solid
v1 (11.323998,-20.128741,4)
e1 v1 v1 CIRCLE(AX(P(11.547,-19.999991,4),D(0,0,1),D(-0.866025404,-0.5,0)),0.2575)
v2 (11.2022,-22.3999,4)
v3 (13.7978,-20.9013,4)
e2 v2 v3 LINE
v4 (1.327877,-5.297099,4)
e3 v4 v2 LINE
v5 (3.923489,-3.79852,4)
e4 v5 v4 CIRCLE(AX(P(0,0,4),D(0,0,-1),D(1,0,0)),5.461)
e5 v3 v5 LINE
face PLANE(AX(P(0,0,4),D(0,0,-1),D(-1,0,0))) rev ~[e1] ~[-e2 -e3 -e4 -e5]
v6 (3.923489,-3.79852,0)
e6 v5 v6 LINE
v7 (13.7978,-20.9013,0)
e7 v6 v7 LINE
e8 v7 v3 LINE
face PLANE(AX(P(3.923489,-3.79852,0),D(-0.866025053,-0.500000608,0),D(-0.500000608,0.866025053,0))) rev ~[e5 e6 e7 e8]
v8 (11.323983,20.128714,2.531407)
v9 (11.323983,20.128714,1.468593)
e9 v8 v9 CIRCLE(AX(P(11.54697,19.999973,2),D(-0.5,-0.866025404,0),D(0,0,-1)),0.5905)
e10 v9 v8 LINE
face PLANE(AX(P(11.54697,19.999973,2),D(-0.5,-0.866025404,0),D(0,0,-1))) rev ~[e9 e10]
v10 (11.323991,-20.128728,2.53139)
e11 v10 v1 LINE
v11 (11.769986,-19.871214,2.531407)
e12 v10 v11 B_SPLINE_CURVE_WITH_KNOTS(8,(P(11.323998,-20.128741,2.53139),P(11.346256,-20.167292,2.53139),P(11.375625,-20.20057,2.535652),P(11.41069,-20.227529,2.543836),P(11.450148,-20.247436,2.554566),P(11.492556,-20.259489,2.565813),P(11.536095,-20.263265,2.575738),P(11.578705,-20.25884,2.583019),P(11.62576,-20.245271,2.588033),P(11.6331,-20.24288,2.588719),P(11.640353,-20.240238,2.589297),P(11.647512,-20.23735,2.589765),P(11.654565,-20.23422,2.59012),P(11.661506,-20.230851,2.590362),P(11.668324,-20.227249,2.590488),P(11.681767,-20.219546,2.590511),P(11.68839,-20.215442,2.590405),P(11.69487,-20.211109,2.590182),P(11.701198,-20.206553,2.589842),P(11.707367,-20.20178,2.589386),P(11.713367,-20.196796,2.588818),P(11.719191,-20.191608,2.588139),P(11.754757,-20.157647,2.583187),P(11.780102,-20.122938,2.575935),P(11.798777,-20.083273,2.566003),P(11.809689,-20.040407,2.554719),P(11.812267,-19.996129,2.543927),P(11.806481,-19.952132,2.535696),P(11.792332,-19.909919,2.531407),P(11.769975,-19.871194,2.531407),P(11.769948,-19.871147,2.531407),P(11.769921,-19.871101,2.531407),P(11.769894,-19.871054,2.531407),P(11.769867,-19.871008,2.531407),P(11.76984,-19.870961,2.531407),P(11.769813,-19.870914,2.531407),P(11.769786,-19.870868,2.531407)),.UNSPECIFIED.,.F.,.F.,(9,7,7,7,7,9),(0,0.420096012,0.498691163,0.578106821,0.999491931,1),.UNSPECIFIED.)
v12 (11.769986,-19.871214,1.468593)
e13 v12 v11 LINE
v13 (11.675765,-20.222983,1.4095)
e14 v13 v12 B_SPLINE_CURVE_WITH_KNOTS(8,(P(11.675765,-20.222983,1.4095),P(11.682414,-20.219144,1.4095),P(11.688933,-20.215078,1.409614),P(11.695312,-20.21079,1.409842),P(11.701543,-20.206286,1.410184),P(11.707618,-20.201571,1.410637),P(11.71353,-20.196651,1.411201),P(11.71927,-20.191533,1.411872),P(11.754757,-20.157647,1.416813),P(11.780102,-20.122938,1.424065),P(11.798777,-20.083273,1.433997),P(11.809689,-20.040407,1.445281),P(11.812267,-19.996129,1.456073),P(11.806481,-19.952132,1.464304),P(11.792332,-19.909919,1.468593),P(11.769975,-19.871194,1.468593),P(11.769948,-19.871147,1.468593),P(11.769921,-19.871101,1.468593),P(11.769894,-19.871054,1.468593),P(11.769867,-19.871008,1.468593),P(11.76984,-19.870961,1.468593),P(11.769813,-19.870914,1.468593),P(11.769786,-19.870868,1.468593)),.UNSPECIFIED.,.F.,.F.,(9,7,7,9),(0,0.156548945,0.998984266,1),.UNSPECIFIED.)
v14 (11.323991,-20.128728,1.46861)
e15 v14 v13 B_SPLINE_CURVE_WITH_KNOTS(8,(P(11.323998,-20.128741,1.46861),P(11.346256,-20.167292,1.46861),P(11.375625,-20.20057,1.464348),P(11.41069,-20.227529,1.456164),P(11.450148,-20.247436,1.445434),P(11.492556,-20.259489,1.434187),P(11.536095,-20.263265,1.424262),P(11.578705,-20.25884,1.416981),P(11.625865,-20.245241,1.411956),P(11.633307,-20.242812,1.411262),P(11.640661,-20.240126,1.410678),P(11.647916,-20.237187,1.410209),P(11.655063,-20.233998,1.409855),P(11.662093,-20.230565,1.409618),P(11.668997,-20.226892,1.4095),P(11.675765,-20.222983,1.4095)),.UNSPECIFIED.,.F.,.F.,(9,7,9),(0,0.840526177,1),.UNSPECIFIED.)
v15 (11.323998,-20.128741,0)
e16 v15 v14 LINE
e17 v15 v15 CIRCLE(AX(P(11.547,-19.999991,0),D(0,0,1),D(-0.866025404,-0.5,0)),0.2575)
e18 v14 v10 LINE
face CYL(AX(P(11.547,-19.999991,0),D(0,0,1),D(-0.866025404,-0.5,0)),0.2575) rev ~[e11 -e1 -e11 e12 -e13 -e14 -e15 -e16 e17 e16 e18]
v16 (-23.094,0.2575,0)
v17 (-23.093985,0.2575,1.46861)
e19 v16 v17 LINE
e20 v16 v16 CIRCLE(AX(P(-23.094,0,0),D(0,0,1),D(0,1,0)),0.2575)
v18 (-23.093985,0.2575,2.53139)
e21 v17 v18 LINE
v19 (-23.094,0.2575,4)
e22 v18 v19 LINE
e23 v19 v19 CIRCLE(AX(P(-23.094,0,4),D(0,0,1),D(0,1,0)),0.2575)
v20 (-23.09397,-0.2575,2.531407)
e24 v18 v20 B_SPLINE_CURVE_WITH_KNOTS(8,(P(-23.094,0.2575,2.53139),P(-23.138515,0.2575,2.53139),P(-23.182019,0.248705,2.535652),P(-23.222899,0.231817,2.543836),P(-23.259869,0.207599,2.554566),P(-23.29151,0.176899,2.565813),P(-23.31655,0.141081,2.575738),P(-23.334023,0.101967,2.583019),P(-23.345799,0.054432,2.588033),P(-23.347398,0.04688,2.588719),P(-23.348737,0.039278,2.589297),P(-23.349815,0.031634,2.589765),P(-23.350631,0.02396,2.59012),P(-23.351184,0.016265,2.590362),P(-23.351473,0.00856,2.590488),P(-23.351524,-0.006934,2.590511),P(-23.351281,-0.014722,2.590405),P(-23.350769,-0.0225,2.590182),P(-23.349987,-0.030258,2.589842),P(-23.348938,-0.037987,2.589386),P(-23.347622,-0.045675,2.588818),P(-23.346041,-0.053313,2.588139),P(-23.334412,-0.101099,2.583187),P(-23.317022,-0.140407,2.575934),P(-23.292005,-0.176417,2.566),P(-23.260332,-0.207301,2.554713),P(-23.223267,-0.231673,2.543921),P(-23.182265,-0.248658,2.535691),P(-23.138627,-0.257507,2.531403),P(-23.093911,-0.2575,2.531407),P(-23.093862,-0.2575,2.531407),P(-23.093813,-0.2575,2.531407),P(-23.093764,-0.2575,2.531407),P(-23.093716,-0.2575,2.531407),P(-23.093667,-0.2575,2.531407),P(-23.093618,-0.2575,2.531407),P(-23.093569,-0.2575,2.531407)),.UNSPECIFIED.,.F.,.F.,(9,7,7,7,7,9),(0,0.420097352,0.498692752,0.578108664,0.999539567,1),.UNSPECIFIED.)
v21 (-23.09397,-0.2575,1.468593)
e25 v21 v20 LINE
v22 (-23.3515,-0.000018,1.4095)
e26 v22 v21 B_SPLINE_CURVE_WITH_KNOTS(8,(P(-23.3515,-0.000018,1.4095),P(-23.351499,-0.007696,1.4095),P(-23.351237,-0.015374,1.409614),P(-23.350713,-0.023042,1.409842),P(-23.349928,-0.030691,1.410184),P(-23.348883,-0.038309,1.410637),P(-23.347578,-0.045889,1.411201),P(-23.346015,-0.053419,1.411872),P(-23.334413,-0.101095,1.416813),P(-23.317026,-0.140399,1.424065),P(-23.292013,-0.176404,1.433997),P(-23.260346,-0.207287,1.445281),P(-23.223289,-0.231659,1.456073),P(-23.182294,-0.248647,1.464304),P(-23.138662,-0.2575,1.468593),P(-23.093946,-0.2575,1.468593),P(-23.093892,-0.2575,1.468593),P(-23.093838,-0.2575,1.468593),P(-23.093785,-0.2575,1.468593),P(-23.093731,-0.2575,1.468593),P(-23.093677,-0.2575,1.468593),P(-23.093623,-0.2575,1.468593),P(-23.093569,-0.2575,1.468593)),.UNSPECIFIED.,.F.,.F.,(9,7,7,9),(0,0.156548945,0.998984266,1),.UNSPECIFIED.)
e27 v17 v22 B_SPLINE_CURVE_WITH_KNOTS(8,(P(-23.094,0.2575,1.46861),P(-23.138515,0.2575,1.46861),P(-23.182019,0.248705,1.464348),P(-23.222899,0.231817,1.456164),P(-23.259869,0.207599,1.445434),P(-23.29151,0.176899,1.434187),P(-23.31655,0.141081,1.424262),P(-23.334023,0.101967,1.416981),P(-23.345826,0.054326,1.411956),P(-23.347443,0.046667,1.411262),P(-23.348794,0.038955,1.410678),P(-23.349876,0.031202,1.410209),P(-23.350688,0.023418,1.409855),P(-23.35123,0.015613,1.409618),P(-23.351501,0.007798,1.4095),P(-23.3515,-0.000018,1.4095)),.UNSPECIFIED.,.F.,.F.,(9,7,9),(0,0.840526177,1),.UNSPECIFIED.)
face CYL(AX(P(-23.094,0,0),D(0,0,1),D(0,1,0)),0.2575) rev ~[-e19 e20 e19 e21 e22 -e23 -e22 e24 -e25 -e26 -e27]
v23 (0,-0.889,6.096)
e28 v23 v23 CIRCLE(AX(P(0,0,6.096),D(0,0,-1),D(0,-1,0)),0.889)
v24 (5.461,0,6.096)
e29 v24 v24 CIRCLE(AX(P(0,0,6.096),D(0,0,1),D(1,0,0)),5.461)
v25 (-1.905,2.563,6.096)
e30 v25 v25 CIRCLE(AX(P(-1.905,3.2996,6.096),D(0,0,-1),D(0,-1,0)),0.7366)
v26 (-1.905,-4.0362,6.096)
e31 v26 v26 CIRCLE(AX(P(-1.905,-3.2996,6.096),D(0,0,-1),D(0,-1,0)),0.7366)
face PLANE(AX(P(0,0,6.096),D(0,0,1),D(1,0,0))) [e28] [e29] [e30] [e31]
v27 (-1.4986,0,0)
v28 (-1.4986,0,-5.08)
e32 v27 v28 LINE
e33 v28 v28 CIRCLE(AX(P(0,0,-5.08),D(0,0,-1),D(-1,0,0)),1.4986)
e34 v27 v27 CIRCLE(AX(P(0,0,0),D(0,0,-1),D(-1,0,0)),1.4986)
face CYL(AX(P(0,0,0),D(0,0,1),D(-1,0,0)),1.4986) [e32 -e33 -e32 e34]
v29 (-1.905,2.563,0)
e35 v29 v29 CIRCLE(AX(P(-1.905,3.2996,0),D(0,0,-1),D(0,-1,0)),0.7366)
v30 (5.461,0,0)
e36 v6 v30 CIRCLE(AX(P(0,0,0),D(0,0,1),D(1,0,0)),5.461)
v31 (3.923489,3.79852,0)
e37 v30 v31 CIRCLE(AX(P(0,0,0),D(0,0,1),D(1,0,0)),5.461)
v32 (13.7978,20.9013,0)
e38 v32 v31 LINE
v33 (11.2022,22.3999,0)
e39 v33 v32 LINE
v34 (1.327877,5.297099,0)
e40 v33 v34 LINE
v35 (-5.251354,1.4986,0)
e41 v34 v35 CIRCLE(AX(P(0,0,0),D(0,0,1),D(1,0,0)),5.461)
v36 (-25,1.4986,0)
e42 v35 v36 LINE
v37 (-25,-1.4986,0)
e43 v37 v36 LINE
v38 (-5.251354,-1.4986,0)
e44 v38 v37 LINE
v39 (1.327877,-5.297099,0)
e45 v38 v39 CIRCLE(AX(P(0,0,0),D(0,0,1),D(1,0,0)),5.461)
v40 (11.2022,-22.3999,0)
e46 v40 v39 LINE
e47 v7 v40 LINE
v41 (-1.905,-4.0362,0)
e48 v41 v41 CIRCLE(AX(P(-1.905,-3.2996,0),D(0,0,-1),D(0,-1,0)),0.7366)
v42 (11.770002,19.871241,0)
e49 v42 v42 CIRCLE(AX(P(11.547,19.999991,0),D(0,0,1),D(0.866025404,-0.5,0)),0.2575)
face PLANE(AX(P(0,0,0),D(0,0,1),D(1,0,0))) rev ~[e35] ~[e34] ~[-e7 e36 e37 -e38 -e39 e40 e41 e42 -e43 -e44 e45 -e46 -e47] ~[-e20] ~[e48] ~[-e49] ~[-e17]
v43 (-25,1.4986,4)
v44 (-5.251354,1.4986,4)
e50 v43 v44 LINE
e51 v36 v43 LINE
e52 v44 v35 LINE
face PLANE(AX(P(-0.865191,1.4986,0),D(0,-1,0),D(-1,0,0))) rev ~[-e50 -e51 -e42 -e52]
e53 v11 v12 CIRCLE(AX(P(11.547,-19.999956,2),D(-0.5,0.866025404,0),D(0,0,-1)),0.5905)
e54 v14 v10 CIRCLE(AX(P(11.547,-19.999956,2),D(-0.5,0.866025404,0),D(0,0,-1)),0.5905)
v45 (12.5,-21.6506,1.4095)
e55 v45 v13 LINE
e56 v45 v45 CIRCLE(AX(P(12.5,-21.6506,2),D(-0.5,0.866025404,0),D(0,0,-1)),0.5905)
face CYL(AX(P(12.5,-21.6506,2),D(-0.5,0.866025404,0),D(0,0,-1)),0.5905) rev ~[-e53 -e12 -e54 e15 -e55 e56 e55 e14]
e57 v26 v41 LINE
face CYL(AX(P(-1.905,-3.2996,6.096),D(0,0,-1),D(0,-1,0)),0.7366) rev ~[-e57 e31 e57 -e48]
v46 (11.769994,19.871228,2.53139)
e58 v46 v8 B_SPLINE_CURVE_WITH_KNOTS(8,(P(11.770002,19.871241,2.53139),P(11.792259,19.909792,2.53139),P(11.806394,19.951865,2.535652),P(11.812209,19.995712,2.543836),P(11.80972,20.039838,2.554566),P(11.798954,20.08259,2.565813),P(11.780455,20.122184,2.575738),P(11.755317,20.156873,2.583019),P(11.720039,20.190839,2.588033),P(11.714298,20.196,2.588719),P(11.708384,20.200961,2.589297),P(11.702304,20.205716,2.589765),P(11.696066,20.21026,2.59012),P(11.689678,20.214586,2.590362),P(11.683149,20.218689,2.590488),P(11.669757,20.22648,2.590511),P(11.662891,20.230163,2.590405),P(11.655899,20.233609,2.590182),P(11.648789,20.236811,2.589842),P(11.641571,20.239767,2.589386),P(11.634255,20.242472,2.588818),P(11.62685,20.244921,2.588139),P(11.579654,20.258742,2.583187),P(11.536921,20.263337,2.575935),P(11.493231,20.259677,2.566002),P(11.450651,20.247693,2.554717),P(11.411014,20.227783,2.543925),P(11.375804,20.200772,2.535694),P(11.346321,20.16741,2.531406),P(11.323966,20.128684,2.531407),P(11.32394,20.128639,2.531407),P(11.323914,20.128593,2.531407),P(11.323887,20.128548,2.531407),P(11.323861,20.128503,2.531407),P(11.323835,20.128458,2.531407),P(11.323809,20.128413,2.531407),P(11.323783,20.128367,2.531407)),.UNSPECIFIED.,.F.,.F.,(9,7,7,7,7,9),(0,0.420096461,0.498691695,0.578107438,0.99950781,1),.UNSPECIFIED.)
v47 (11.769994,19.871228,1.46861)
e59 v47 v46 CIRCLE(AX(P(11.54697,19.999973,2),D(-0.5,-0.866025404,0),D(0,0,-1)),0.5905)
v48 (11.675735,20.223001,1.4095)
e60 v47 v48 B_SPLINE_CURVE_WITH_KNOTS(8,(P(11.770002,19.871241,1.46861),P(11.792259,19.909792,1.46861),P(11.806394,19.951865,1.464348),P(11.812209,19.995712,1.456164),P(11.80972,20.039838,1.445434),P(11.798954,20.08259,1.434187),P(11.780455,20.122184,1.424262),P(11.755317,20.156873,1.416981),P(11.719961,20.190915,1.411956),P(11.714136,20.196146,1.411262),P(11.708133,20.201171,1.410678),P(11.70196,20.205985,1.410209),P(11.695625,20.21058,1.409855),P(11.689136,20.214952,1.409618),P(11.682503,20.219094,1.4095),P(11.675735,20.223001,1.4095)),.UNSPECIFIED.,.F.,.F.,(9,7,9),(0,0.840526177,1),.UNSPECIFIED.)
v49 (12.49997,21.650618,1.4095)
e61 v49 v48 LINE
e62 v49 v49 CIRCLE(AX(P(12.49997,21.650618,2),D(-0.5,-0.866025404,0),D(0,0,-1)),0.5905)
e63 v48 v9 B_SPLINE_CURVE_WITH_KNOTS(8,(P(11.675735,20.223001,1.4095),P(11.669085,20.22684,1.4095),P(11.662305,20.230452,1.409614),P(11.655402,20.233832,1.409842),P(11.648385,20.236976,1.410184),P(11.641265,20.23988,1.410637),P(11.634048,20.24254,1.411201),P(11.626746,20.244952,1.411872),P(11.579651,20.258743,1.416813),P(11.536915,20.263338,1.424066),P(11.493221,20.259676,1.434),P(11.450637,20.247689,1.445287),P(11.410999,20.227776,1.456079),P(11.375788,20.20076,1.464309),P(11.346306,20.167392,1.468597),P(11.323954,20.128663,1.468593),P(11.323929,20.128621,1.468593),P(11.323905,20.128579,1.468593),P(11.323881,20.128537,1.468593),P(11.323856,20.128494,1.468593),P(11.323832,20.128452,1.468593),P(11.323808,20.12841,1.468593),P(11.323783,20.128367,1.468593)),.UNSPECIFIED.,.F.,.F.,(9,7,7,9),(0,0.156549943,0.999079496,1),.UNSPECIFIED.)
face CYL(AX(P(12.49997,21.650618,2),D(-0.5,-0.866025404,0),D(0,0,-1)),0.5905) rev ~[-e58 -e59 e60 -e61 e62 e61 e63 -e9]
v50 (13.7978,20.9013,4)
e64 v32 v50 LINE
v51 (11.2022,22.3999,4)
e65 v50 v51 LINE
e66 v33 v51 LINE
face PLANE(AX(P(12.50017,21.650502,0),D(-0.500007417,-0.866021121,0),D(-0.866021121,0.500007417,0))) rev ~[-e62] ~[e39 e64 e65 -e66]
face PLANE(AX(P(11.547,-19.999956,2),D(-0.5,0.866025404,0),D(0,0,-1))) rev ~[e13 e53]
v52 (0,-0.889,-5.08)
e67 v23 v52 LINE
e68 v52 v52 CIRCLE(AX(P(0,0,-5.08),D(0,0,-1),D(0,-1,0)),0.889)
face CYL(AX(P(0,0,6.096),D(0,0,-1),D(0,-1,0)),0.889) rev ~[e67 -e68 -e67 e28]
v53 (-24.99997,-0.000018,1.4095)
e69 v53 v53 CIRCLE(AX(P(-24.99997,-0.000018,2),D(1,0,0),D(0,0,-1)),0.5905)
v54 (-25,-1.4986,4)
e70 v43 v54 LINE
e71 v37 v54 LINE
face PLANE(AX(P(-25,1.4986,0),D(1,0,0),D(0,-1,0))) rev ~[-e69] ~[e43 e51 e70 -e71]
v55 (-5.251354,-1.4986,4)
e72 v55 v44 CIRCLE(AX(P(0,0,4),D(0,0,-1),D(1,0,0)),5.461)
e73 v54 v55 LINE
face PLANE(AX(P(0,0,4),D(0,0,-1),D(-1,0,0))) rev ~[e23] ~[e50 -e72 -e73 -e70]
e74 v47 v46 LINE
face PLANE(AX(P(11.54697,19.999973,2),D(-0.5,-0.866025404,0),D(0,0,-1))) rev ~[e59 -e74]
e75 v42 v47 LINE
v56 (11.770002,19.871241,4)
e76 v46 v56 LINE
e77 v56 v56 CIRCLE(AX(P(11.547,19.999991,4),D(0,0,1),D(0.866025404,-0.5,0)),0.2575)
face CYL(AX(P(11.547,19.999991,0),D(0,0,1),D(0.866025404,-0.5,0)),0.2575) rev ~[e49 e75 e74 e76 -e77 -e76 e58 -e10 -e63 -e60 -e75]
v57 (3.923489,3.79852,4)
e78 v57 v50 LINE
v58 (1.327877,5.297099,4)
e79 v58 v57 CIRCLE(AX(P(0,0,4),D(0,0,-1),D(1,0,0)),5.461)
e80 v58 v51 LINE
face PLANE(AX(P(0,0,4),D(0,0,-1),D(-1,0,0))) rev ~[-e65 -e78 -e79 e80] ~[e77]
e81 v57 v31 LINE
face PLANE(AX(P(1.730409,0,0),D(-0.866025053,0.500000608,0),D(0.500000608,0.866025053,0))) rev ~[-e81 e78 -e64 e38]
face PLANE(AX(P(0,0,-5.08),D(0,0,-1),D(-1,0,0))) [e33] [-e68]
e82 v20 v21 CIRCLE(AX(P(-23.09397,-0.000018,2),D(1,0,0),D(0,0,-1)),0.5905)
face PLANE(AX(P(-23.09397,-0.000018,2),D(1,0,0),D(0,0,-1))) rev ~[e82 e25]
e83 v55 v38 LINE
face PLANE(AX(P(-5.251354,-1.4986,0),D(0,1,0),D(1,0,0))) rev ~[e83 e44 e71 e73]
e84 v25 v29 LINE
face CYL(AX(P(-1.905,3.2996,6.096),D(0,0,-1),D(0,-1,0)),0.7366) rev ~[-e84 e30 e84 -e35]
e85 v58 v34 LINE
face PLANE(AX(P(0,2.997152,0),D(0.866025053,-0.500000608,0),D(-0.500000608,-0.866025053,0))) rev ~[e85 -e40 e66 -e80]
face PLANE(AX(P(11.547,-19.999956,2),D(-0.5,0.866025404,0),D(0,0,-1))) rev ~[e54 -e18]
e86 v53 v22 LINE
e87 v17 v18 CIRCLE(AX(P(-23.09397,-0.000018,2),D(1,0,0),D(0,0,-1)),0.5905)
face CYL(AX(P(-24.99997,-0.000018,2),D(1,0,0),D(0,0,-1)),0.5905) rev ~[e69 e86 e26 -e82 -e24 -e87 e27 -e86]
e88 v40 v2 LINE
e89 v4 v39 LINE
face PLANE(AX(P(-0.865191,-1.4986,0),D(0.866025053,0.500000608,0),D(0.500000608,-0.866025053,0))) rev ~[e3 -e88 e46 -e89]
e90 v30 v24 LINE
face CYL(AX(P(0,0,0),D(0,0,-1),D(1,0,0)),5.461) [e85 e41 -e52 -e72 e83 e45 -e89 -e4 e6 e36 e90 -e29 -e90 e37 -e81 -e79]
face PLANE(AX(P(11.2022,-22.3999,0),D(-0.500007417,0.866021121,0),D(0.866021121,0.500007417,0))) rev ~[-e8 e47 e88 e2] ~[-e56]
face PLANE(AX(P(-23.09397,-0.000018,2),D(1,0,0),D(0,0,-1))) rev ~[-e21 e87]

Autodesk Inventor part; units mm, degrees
ref_plane "YZ Plane" through (0, 0, 0) normal (1, 0, 0) x (0, 1, 0)
ref_plane "XZ Plane" through (0, 0, 0) normal (0, 1, 0) x (-1, 0, 0)
ref_plane "XY Plane" through (0, 0, 0) normal (0, 0, 1) x (1, 0, 0)
sketch "Sketch1" plane through (0, 0, 0) normal (0, 0, 1) x (1, 0, 0)
  circle A0 centre (0, 0) radius 5.461
  dimension "d0" = 10.922
extrude "Extrusion1" add sketch "Sketch1" along normal blind 6.096
sketch "Sketch2" plane through (0, 0, 0) normal (0, 0, -1) x (-1, 0, 0)
  circle A0 centre (0, 0) radius 5.461 projected
  line L0 (0, -35) -> (0, 35) projected
  line L1 (35, 0) -> (-35, 0) projected
  line L2 (0, 1.4986) -> (25, 1.4986)
  line L3 (25, 1.4986) -> (25, -1.4986)
  line L4 (25, -1.4986) -> (0, -1.4986)
  line L5 (0, -1.4986) -> (0, 1.4986)
  line L6 (-1.2978, -0.7493) -> (-13.7978, 20.9013)
  line L7 (-13.7978, 20.9013) -> (-11.2022, 22.3999)
  line L8 (-11.2022, 22.3999) -> (1.2978, 0.7493)
  line L9 (1.2978, 0.7493) -> (-1.2978, -0.7493)
  line L10 (1.2978, -0.7493) -> (-11.2022, -22.3999)
  line L11 (-11.2022, -22.3999) -> (-13.7978, -20.9013)
  line L12 (-13.7978, -20.9013) -> (-1.2978, 0.7493)
  line L13 (-1.2978, 0.7493) -> (1.2978, -0.7493)
  circle A1 centre (0, 0) radius 25
  point P0 (25, 0)
  point P1 (-12.5, 21.6506)
  point P2 (-12.5, -21.6506)
  dimension "d3" = 2.9972
  dimension "d6" = 360
  dimension "d8" = 50
extrude "Extrusion2" add sketch "Sketch2" against normal blind 4 contours L1 L9 L8 L2 A0 | L1 A1 L4 A0 | A0 L2 A1 L1 | A0 L4 L10 L13 L1 | A1 L2 L3 | L3 L4 A1 | L13 L10 L4 L0 | L13 L12 L6 A0 L8 L0 | L9 L6 L1 | L0 L2 L8 L9 | L0 L10 A0 L12 L6 L9 | L1 L12 L13 | L2 L0 L8 | L10 L0 L4 | A0 L6 A1 L8 | L10 A1 L12 A0 | A1 L7 L8 | L10 L11 A1 | L6 L7 A1 | A1 L11 L12
sketch "Sketch6" plane through (0, 0, 0) normal (0, 0, -1) x (-1, 0, 0)
  line L0 (5.2514, 1.4986) -> (25, 1.4986) projected
  arc A0 (-3.9235, 3.7985) -> (-3.9235, -3.7985) centre (0, 0) ccw projected
  circle A1 centre (0, 0) radius 23.094
  line L1 (0, 0) -> (27, 0)
  line L2 (0, 0) -> (-13.5, -23.3827)
  line L3 (0, 0) -> (-13.5, 23.3827)
  point P0 (-11.547, 20)
  point P1 (23.094, 0)
  dimension "d26" = 360
  dimension "d28" = 40
hole "Hole2" at (-23.094, 0, 0) direction (0, 0, 1) diameter 0.515 end through all
pattern_circular "Circular Pattern2" count 3 over 360 about axis through (0, 0, -10) along (0, 0, 1) of "Hole2"
sketch "Sketch8" plane through (11.2022, -22.3999, 0) normal (0.5, -0.8660254, 0) x (0.8660254, 0.5, 0)
  line L0 (2.9972, 4) -> (0, 4) projected
  line L1 (1.4986, -1.2192) -> (1.4986, 7.3152) projected
  line L2 (1.4986, 4) -> (1.4986, 0)
  point P0 (1.4986, 2)
hole "Hole4" at (12.5, -21.6506, 2) direction (-0.5, 0.8660254, 0) diameter 1.181 depth 1.906 thread size "0-80 UNF" class "2B" standard "ANSI Unified Screw Threads"
pattern_circular "Circular Pattern3(Side_hole)" count 3 over 360 about axis through (0, 0, -10) along (0, 0, 1) of "Hole4"
sketch "Sketch18" plane through (0, 0, 6.096) normal (0, 0, 1) x (1, 0, 0)
  circle A0 centre (0, 0) radius 5.461 projected
  line L0 (-32.72, 0) -> (21.3198, 0) projected
  point P0 (3.81, 0)
  point P1 (-1.905, 3.2996)
  point P2 (-1.905, -3.2996)
  dimension "d87" = 3.81
  dimension "d90" = 360
hole "Hole7" at (-1.905, 3.2996, 6.096) at (-1.905, -3.2996, 6.096) direction (0, 0, -1) diameter 1.4732 end through all
sketch "Sketch22" plane through (0, 0, 0) normal (0, 0, -1) x (-1, 0, 0)
  arc A0 (-1.3279, -5.2971) -> (5.2514, -1.4986) centre (0, 0) ccw projected
  circle A1 centre (0, 0) radius 1.4986
  dimension "d104" = 2.9972
extrude "Extrusion9" add sketch "Sketch22" along normal blind 5.08
sketch "Sketch23" plane through (0, 0, 6.096) normal (0, 0, 1) x (1, 0, 0)
  circle A0 centre (0, 0) radius 5.461 projected
hole "Hole8" at (0, 0, 6.096) direction (0, 0, -1) diameter 1.778 end through all clearance for "Flat Head Machine Screw (82)" size "#0" standard "Ansi Unified Screw Threads"
properties part number "TriPost" material "Aluminum-6061"
